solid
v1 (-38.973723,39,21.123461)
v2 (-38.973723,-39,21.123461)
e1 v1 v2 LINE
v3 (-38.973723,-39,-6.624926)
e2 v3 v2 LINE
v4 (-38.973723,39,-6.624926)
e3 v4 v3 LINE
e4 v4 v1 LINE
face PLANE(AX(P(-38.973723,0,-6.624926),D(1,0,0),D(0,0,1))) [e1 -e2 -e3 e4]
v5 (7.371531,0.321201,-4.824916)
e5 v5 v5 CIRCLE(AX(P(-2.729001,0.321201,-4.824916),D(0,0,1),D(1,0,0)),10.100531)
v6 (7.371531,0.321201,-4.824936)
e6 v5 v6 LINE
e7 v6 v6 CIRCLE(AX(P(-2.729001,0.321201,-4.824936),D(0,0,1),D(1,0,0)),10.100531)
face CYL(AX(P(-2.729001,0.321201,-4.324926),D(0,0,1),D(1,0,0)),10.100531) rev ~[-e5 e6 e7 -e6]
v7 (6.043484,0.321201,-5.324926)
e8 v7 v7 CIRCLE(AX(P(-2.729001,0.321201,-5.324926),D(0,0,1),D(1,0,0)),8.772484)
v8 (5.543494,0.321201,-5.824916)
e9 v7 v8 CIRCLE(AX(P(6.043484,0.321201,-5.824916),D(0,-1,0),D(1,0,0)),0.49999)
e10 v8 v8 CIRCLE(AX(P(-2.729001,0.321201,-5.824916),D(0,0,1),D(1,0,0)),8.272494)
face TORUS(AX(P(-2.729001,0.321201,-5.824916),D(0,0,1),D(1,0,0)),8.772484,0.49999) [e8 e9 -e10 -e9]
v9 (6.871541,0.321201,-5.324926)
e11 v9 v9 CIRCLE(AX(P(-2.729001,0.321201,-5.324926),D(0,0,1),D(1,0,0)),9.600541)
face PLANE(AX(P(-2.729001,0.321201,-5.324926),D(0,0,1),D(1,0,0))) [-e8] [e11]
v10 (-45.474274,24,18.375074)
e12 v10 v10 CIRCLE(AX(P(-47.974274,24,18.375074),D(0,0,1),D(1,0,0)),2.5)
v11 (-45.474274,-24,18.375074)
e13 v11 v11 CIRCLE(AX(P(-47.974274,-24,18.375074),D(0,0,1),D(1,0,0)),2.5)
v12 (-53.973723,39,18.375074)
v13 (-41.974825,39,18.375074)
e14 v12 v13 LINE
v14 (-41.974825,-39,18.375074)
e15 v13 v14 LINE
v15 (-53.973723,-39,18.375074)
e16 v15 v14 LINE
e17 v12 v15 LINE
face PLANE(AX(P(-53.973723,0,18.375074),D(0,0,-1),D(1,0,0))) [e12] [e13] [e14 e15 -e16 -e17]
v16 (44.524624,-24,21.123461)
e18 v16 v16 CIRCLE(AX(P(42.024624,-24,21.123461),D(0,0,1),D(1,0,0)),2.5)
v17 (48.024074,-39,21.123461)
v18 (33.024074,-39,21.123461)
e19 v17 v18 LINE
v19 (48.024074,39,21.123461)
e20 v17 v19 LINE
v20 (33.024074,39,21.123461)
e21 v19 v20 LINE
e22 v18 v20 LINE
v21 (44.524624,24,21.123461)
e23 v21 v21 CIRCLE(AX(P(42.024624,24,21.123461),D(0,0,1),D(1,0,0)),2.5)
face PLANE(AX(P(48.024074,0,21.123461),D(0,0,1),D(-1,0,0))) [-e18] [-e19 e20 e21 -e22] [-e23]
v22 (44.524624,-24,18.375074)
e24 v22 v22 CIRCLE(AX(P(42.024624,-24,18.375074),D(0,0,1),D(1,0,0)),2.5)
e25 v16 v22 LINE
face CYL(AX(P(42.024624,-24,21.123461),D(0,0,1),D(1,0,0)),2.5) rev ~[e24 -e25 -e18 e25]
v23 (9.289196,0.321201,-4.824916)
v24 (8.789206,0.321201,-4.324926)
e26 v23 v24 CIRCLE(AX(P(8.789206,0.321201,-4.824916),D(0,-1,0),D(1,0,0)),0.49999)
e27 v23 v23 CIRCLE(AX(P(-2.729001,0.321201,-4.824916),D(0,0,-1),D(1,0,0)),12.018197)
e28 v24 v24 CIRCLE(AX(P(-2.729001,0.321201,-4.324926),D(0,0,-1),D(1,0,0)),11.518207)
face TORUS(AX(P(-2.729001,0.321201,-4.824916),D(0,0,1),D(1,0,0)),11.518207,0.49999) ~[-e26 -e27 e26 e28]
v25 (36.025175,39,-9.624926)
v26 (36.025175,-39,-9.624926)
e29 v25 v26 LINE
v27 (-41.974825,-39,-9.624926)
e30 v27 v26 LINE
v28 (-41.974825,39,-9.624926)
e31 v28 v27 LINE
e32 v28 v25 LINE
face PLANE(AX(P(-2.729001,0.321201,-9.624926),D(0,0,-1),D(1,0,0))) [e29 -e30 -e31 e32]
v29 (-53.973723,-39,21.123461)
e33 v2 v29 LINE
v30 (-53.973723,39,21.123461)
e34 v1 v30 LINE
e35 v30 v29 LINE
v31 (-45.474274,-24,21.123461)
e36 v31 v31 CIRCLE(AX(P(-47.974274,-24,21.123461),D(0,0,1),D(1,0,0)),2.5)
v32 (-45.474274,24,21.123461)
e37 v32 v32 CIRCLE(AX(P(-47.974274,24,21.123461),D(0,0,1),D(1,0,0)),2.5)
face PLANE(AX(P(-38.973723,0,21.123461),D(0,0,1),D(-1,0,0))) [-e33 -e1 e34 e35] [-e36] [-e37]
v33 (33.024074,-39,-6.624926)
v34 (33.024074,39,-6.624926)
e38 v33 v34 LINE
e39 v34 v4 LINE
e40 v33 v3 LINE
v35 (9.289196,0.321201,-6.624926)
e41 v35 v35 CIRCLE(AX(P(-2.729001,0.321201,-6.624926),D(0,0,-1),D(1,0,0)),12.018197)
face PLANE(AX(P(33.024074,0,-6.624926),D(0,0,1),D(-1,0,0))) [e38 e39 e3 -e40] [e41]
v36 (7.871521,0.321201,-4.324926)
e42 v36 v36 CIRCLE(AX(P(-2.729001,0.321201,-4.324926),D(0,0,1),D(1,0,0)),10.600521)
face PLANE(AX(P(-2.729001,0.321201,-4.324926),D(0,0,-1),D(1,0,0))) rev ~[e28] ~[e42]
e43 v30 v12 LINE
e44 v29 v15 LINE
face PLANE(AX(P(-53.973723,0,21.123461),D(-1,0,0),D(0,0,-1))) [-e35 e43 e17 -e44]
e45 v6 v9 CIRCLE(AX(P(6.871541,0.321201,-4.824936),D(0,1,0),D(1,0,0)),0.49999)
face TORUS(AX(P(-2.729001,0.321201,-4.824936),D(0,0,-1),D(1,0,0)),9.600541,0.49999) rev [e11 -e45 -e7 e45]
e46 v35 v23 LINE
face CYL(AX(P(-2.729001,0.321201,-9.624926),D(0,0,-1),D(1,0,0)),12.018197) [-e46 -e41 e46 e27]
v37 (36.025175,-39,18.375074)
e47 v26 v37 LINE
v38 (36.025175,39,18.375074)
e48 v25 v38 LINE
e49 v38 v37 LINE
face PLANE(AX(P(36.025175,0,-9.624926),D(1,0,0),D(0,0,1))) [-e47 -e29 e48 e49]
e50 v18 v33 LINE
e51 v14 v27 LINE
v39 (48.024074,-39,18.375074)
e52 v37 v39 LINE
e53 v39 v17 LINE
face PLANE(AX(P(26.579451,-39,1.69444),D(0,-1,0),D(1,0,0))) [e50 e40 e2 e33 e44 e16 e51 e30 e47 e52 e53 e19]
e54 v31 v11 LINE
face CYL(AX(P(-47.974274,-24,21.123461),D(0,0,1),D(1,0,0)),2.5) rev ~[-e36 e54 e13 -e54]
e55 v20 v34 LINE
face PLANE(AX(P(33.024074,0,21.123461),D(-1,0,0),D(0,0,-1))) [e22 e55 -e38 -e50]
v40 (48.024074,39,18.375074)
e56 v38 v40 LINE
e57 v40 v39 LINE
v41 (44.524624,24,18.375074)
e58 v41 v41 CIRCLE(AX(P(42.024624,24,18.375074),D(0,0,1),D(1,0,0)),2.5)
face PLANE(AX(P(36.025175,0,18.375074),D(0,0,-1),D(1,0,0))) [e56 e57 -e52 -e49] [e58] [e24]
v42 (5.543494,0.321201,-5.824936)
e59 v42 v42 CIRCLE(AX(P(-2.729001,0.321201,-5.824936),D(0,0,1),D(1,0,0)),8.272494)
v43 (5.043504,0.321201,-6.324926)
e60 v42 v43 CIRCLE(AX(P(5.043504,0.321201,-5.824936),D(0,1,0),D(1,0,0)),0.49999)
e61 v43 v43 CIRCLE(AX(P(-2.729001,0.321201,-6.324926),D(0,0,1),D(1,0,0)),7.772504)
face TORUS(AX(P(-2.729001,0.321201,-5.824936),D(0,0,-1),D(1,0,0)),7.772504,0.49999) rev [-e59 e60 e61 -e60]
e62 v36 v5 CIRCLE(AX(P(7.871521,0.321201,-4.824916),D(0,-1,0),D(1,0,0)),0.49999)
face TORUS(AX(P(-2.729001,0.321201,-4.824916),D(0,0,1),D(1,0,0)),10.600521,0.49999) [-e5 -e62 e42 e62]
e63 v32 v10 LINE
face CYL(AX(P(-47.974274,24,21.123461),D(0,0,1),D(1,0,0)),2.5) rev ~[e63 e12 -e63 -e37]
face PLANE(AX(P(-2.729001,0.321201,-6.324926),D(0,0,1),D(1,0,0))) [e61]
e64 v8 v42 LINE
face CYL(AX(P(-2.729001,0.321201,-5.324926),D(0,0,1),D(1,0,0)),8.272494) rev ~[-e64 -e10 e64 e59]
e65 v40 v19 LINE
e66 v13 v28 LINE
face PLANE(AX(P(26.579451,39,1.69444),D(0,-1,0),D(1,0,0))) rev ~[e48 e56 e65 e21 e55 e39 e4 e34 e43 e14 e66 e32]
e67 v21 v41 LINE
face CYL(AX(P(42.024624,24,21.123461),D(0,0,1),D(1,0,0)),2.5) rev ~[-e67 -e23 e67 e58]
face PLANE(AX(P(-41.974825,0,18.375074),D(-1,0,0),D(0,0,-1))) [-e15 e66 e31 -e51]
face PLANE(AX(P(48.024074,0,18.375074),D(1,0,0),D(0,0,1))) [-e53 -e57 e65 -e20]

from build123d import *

# Parameters (mm, degrees)
F1_DEPTH = 39
F2_R     = 2.5
F3_DEPTH = 2.748386896
F4_R     = 12.0181970212
F5_DEPTH = 5.3
F6_R     = 10.1005312929
F7_DEPTH = 1
F8_R     = 8.272494484
F9_DEPTH = 1
F10_R    = 0.49999


# Not quite as in the source:
# - a fillet or chamfer is up to 0.001 mm smaller than in the source, because OpenCascade refuses the exact size


with BuildPart() as f1:
    # F0 (on Front) → F1 (new body, symmetric)
    with BuildSketch(Plane.XZ):
        Polygon((33.0240737289, -6.6249261405), (-2.9748248395, -6.6249261405), (-2.9748248395, -9.6249261405), (36.0251751605, -9.6249261405), (36.0251751605, 18.3750738595), (48.0240737289, 18.3750738595), (48.0240737289, 21.1234607555), (33.0240737289, 21.1234607555), align=None)
        Polygon((-2.9748248395, -9.6249261405), (-2.9748248395, -6.6249261405), (-38.9737234078, -6.6249261405), (-38.9737234078, 21.1234607555), (-53.9737234078, 21.1234607555), (-53.9737234078, 18.3750738595), (-41.9748248395, 18.3750738595), (-41.9748248395, -9.6249261405), align=None)
    extrude(amount=F1_DEPTH, both=True)

    # F2 (on face) → F3 (cut, through all)
    with BuildSketch(Plane.XY.offset(21.1234607555)):
        with Locations((42.0246244447, -24)):
            Circle(F2_R)
        with Locations((42.0246244447, 24)):
            Circle(F2_R)
        with Locations((-47.9742741236, 24)):
            Circle(F2_R)
        with Locations((-47.9742741236, -24)):
            Circle(F2_R)
    extrude(amount=-F3_DEPTH, mode=Mode.SUBTRACT)

    # F4 (on face) → F5 (join)
    with BuildSketch(Plane(origin=(0, 0, -9.6249261405), x_dir=(1, 0, 0), z_dir=(0, 0, -1))):
        with Locations((-2.7290005237, -0.3212007869)):
            Circle(F4_R)
    extrude(amount=-F5_DEPTH)

    # F6 (on face) → F7 (cut)
    with BuildSketch(Plane.XY.offset(-4.3249261405)):
        with Locations((-2.7290005237, 0.3212007869)):
            Circle(F6_R)
    extrude(amount=-F7_DEPTH, mode=Mode.SUBTRACT)

    # F8 (on face) → F9 (cut)
    with BuildSketch(Plane.XY.offset(-5.3249261405)):
        with Locations((-2.7290005237, 0.3212007869)):
            Circle(F8_R)
    extrude(amount=-F9_DEPTH, mode=Mode.SUBTRACT)

    # F10 (radius 0.5 in the source; OpenCascade refuses exactly that, so slightly less here)
    f10_edges = [f1.edges().sort_by_distance(p)[0] for p in [
        (-14.747198, 0.321201, -4.324926),
        (-12.829532, 0.321201, -4.324926),
        (-12.829532, 0.321201, -5.324926),
        (-11.001495, 0.321201, -5.324926),
        (-11.001495, 0.321201, -6.324926),
    ]]
    fillet(f10_edges, radius=F10_R)


solid = f1.part
